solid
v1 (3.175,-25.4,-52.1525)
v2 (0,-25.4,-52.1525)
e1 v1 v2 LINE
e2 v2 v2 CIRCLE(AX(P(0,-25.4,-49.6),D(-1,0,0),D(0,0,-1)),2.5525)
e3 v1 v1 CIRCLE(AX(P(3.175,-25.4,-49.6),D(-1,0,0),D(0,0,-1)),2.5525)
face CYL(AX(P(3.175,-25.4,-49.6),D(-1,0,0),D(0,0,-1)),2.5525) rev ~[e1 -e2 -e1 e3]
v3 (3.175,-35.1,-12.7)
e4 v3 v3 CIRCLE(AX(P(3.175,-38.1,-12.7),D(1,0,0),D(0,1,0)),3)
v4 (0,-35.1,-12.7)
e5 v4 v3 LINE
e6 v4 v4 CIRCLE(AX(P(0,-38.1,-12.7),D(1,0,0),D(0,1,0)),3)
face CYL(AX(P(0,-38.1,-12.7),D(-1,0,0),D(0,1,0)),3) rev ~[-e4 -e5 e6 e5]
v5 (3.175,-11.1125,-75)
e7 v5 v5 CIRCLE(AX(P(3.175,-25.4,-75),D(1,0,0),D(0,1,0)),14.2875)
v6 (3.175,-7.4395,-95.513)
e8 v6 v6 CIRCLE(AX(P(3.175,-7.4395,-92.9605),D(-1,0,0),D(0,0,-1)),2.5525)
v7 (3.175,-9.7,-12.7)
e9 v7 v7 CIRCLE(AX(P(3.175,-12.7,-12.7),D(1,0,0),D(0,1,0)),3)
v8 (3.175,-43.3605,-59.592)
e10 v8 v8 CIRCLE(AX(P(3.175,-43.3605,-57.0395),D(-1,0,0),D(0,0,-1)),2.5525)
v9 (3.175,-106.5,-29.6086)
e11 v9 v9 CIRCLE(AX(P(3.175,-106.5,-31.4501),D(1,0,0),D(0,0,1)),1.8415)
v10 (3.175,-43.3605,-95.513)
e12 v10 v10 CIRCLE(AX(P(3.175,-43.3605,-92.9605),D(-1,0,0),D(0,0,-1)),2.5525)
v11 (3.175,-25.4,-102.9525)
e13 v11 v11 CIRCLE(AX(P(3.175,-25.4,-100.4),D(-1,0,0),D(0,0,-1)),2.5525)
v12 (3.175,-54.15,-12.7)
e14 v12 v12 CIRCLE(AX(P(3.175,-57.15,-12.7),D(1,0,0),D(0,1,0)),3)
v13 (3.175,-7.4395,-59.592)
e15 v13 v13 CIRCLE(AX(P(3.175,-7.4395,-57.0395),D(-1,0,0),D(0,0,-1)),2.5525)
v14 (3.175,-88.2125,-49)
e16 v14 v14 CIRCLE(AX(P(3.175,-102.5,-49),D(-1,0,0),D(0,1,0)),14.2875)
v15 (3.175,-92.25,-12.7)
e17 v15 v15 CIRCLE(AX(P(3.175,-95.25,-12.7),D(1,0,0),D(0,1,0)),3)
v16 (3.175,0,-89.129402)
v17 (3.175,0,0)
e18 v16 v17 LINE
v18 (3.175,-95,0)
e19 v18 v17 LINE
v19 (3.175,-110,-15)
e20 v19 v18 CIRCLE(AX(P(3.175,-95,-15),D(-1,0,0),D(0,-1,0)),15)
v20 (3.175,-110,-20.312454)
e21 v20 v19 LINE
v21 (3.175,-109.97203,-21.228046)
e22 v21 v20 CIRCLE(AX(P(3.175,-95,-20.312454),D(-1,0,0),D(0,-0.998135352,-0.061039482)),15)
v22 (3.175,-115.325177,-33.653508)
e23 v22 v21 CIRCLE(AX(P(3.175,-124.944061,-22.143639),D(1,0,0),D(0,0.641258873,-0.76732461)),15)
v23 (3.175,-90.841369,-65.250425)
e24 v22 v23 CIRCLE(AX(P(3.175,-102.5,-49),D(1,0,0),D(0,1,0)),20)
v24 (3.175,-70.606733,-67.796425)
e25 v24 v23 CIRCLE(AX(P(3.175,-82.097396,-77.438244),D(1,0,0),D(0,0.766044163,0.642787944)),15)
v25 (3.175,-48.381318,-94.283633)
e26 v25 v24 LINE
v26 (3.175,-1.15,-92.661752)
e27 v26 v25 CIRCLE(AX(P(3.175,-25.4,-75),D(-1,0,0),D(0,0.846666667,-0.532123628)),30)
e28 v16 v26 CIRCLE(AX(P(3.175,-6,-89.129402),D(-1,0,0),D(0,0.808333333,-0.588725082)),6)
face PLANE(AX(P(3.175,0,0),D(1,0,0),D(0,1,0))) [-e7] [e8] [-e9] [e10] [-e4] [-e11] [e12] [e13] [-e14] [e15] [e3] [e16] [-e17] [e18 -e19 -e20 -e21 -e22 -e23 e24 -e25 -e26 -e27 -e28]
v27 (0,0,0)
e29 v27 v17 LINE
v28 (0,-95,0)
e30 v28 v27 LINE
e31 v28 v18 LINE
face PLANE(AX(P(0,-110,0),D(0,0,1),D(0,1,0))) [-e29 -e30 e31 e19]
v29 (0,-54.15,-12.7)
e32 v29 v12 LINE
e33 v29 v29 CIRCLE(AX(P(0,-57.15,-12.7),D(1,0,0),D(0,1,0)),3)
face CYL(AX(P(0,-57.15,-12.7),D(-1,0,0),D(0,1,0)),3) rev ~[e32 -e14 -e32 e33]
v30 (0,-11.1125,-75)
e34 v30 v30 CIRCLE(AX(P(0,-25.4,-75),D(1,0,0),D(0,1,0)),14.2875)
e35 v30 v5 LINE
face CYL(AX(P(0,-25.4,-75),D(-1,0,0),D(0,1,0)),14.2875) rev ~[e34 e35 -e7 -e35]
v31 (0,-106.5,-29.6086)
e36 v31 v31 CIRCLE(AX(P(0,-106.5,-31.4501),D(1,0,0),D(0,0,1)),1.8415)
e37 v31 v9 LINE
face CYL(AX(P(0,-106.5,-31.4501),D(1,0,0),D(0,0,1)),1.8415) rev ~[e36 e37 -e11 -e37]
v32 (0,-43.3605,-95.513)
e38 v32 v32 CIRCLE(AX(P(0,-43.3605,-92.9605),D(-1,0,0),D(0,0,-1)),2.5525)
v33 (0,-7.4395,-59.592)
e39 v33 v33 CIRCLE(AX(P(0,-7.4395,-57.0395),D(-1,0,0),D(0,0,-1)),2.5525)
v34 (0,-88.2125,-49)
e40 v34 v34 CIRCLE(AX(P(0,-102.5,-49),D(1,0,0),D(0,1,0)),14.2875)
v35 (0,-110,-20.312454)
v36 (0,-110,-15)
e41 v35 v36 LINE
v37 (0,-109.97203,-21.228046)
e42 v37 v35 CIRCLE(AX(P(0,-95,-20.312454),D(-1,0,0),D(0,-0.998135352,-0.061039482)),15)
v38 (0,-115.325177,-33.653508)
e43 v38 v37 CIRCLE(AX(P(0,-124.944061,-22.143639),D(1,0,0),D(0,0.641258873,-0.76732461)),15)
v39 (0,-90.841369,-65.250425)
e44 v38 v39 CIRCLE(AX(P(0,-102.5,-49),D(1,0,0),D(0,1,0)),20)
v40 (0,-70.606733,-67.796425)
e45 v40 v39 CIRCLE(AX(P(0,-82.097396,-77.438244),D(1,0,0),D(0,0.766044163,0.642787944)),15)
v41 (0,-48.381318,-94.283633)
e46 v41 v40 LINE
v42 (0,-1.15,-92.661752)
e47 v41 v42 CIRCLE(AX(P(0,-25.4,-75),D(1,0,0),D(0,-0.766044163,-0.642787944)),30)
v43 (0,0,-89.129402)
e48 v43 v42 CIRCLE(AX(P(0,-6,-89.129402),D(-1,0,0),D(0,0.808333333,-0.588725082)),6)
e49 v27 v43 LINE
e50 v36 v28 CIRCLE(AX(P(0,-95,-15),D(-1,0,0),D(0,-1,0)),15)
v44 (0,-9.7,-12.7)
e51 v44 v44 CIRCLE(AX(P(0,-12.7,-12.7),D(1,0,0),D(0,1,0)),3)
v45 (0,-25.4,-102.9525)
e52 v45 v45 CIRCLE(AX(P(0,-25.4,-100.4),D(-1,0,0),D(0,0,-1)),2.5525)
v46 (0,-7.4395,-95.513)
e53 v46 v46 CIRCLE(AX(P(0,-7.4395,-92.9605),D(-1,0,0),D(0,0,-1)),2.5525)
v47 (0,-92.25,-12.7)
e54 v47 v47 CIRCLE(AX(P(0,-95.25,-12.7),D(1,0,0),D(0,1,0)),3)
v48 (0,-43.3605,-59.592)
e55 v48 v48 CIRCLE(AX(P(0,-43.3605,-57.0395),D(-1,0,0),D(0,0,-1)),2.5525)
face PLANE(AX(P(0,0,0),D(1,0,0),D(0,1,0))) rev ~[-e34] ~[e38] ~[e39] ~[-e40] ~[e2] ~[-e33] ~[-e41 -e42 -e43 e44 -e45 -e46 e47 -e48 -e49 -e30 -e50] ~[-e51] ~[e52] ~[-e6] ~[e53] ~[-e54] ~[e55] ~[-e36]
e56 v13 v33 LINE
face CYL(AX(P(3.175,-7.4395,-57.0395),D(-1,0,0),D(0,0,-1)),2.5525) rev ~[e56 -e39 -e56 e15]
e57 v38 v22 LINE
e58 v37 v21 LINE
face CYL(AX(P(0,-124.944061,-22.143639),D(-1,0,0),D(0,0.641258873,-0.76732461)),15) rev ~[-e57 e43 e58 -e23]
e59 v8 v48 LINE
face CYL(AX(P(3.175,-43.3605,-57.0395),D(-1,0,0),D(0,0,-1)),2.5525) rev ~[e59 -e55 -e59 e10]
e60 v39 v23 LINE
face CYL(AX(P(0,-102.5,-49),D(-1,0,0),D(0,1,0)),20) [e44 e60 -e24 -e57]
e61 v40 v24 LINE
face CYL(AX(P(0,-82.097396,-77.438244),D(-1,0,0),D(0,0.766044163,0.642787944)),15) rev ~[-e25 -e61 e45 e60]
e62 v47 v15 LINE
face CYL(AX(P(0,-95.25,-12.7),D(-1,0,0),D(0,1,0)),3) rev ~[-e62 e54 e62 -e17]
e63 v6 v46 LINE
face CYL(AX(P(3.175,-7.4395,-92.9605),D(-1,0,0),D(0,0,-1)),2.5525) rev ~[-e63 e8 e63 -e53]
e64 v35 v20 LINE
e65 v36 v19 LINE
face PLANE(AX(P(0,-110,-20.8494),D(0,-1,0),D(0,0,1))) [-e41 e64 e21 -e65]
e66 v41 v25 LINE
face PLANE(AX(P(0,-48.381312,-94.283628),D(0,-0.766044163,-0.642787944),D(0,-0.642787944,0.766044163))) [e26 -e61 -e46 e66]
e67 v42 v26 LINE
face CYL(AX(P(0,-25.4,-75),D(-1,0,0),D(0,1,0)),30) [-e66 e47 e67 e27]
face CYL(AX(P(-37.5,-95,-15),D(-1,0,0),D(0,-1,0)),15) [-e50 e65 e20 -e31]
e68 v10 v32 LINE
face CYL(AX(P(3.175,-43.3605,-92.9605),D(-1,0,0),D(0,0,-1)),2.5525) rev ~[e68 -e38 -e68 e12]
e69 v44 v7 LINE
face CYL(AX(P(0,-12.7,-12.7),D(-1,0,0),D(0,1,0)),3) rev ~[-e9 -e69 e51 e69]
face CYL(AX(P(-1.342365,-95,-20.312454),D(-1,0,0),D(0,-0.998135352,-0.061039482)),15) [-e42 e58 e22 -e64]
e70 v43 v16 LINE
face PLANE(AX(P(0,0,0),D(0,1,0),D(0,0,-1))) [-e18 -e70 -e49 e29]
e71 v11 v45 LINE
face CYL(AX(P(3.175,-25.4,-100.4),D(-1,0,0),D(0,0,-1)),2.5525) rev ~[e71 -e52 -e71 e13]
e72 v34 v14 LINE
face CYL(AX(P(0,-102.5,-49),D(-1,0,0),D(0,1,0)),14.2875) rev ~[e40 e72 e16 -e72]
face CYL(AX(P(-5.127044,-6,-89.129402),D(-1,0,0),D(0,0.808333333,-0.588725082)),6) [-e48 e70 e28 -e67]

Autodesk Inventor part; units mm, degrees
ref_plane "YZ Plane" through (0, 0, 0) normal (1, 0, 0) x (0, 1, 0)
ref_plane "XZ Plane" through (0, 0, 0) normal (0, 1, 0) x (-1, 0, 0)
ref_plane "XY Plane" through (0, 0, 0) normal (0, 0, 1) x (1, 0, 0)
sketch "Sketch1" plane through (0, 0, 0) normal (1, 0, 0) x (0, 1, 0)
  line L0 (-39.3892, -105) -> (-110, -20.8494)
  line L1 (-110, -20.8494) -> (-110, 0)
  line L2 (-110, 0) -> (0, 0)
  line L3 (0, 0) -> (0, -105)
  line L4 (0, -105) -> (-39.3892, -105)
  line L5 (-110, -20.8494) -> (-119.38, 0) construction
  line L6 (-119.38, 0) -> (-110, 0) construction
  line L7 (-50.8, -25.4) -> (0, -25.4) construction
  line L8 (0, -25.4) -> (0, 0) construction
  line L9 (0, 0) -> (-50.8, 0) construction
  line L10 (-50.8, 0) -> (-50.8, -25.4) construction
  line L11 (-50.8, -25.4) -> (0, 0) construction
  line L12 (0, -25.4) -> (-50.8, 0) construction
  circle A0 centre (-12.7, -12.7) radius 3
  circle A1 centre (-38.1, -12.7) radius 3
  circle A2 centre (-102.5, -49) radius 14.2875
  circle A3 centre (-25.4, -75) radius 14.2875
  circle A4 centre (-102.5, -49) radius 20
  circle A5 centre (-25.4, -75) radius 30
  line L13 (-50.8, -90.9637) -> (-50.8, -59.0363)
  line L14 (-102.5, -49) -> (-25.4, -75) construction
  circle A6 centre (-57.15, -12.7) radius 3
  circle A7 centre (-95.25, -12.7) radius 3
  point P0 (-25.4, -12.7)
  point P1 (-25.4, -25.4)
  point P2 (-103.1519, -29.0106)
  point P3 (-82.9275, -53.1131)
  point P4 (-50.8, -75)
  point P5 (-48.3813, -94.2836)
  point P6 (0, -90.9637)
  dimension "d0" = 50
  dimension "d1" = 119.38
  dimension "d2" = 50.8
  dimension "d3" = 25.4
  dimension "d4" = 25.4
  dimension "d5" = 12.7
  dimension "d6" = 6
  dimension "d7" = 6
  dimension "d8" = 28.575
  dimension "d9" = 102.5
  dimension "d10" = 49
  dimension "d13" = 110
  dimension "d16" = 60
  dimension "d17" = 25.4
  dimension "d18" = 25.4
  dimension "d20" = 40
  dimension "d44" = 81.3659
  dimension "d45" = 38.1
  dimension "d46" = 19.05
extrude "Plate1" add sketch "Sketch1" along normal blind 3.175 contours L0 A4 L1 L2 L3 A5 | A5 L13 L3 | A4 L0 A2 | L0 A2 A4 | A5 L13
fillet "Corner Round1" radius 15 4 edges at (1.5875, -82.9275, -53.1131) (1.5875, -103.1519, -29.0106) (1.5875, -110, -20.8494) (1.5875, -110, 0)
fillet "Corner Round1" radius 6 1 edges at (1.5875, 0, -90.9637)
sketch "Sketch2" plane through (0, 0, 0) normal (-1, 0, 0) x (0, 0, 1)
  circle A0 centre (-31.4501, -106.5) radius 4.5847
  circle A1 centre (-49, -102.5) radius 14.2875 projected
  point P0 (0, 0)
  dimension "d21" = 9.1694
  dimension "d22" = 18
  dimension "d23" = 4
hole "Hole1" at (0, -106.5, -31.4501) direction (1, 0, 0) diameter 3.683 end through all thread size "10-24 UNC" class "2B" standard "ANSI Unified Screw Threads"
sketch "Sketch3" plane through (3.175, 0, 0) normal (1, 0, 0) x (0, 0, -1)
  circle A0 centre (75, -25.4) radius 14.2875 projected
  circle A1 centre (75, -25.4) radius 25.4
  line L0 (49.6, -25.4) -> (100.4, -25.4)
  line L1 (92.9605, -7.4395) -> (57.0395, -7.4395)
  line L2 (75, -25.4) -> (57.0395, -7.4395)
  line L3 (92.9605, -43.3605) -> (57.0395, -43.3605)
  line L4 (75, -25.4) -> (92.9605, -43.3605)
  line L5 (25.4, -50.8) -> (0, -50.8)
  line L6 (0, -50.8) -> (0, 0)
  line L7 (0, 0) -> (25.4, 0)
  line L8 (25.4, 0) -> (25.4, -50.8)
  line L9 (25.4, -50.8) -> (0, 0) construction
  line L10 (0, -50.8) -> (25.4, 0) construction
  point P0 (12.7, -25.4)
  dimension "d31" = 50.8
  dimension "d32" = 45
  dimension "d40" = 25.4
  dimension "d41" = 50.8
hole "Hole2" at (3.175, -7.4395, -57.0395) at (3.175, -25.4, -49.6) at (3.175, -43.3605, -57.0395) at (3.175, -43.3605, -92.9605) at (3.175, -25.4, -100.4) at (3.175, -7.4395, -92.9605) direction (-1, 0, 0) diameter 5.105 end through all clearance for "Flat Head Machine Screw (82)" size "#10" standard "Ansi Unified Screw Threads"
equation "\"d5\" = 0.5 * d4"
equation "\"d7\" = d6"
equation "\"d29\" = Thickness"
equation "\"d14\" = Thickness"
equation "\"d18\" = d17"
equation "\"BendRadius\" = Thickness"
equation "\"BendReliefWidth\" = Thickness"
equation "\"BendReliefDepth\" = 0.5 * Thickness"
equation "\"CornerReliefSize\" = 4 * Thickness"
equation "\"MinimumRemnant\" = 2 * Thickness"
equation "\"TransitionRadius\" = BendRadius"
equation "\"JacobiRadiusSize\" = BendRadius"
equation "\"GapSize\" = Thickness"
equation "\"Thickness\" = 3.175"
properties part number "INSIDE_INTAKE_PLATE" material "Aluminum, 6061-T6"
